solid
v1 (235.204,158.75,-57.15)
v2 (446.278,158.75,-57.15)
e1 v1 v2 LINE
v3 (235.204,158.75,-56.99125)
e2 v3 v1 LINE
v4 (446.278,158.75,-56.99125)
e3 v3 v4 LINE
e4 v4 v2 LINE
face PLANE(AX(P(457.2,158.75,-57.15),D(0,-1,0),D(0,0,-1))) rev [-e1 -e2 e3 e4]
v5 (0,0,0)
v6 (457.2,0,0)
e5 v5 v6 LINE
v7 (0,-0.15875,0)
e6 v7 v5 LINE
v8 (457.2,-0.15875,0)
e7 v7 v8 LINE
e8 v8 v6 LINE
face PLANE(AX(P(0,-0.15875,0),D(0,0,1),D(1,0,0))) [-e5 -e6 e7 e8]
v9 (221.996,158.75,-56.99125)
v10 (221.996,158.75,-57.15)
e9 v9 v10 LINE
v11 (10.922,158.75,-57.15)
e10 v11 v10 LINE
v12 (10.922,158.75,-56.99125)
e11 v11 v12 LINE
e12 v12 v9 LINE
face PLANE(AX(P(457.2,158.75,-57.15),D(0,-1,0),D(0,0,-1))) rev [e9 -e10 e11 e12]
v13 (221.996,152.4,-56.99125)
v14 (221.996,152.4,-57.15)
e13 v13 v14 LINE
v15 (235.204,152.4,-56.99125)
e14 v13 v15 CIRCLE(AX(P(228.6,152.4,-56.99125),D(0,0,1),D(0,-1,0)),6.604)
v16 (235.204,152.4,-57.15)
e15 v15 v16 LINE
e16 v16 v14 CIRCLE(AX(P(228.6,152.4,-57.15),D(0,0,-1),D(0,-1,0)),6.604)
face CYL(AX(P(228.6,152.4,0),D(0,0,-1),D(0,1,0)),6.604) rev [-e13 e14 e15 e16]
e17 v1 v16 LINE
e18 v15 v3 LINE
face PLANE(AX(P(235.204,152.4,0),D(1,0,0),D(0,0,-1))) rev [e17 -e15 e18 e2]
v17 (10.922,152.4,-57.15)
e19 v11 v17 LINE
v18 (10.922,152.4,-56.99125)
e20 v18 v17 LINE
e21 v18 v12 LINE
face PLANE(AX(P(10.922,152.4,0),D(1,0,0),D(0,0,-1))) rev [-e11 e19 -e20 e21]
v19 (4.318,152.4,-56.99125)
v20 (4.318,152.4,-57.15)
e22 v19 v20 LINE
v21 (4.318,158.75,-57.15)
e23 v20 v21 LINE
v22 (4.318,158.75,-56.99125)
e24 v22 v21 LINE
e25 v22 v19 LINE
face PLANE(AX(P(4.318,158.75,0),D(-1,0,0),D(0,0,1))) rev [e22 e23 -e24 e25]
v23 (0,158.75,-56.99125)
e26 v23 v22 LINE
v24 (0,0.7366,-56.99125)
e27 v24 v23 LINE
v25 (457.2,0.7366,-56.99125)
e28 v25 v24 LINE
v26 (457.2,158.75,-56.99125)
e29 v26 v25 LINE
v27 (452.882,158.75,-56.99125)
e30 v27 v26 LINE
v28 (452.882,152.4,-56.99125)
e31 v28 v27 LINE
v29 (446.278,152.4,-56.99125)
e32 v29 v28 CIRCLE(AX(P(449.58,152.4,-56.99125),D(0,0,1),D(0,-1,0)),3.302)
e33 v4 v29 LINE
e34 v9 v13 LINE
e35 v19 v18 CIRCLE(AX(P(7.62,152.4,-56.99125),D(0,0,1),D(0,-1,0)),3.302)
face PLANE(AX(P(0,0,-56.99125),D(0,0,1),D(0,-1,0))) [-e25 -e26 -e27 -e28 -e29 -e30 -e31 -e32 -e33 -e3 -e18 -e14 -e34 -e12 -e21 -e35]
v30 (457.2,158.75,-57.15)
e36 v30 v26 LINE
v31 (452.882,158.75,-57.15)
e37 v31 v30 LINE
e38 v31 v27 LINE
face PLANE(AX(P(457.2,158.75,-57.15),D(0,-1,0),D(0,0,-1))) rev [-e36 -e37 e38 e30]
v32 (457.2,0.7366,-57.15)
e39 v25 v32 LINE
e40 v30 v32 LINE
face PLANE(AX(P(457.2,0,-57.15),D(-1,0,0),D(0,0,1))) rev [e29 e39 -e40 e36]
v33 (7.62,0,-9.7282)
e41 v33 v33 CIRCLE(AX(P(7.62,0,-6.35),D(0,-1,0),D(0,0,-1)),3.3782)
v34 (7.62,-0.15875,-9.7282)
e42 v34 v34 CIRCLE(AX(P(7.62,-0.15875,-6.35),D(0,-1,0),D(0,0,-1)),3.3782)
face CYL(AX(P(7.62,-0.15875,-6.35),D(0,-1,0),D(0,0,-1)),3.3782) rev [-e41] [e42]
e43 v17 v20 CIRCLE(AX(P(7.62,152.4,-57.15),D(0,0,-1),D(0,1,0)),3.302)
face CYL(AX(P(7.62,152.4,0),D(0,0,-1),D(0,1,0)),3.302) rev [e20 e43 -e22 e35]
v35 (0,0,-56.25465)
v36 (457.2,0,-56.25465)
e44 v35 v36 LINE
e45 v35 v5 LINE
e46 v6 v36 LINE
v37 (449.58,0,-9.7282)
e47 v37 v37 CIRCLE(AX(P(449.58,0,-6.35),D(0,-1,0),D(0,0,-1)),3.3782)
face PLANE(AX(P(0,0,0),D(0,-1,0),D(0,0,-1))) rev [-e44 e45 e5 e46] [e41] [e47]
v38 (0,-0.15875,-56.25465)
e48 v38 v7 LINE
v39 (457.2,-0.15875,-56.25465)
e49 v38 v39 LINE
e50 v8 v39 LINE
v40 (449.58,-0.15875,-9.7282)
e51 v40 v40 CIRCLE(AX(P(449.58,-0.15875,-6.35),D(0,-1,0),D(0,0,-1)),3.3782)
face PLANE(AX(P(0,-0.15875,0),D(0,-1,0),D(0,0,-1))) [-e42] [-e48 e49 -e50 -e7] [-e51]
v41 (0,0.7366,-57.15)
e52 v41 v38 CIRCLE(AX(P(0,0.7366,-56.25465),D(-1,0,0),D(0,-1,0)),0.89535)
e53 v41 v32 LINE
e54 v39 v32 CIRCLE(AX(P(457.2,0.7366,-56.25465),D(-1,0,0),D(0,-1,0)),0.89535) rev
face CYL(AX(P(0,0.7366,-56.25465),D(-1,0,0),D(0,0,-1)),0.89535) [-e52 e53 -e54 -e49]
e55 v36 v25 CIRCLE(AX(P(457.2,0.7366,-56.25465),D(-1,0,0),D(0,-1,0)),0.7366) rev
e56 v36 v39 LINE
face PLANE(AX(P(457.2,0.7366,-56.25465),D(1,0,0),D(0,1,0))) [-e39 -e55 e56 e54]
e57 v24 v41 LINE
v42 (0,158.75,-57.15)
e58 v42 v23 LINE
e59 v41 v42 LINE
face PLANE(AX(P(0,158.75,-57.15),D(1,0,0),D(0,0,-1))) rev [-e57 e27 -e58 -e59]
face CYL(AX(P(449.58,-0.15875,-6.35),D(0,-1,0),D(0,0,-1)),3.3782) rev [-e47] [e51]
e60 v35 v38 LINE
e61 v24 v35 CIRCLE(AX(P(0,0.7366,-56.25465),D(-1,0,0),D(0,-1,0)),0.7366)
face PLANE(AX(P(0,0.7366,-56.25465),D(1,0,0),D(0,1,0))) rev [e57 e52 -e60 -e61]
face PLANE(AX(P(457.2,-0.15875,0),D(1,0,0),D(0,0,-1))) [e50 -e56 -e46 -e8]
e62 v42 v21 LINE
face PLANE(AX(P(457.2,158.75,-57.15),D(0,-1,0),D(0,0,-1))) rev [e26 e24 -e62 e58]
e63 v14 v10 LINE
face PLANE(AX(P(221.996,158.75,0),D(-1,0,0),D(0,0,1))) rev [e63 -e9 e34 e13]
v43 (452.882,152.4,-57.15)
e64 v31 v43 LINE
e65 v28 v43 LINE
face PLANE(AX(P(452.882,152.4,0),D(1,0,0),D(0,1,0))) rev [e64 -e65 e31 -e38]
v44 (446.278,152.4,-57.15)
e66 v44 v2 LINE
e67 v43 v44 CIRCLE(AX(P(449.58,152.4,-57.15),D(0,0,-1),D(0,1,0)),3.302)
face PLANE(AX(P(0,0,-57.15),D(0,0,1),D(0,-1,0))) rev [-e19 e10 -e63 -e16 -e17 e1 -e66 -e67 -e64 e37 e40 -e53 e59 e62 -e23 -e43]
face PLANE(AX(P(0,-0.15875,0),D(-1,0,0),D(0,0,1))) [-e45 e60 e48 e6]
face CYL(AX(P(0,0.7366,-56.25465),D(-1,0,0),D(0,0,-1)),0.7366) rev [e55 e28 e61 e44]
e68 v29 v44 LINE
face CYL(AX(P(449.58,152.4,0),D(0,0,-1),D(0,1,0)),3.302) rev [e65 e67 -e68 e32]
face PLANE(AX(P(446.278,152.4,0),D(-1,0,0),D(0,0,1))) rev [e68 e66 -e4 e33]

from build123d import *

# Parameters (mm, degrees)
SKETCH1_W                    = 457.2
SKETCH1_H                    = 57.15
BASE_FLANGE1_DEPTH           = 0.15875
EDGE_FLANGE1_STRIP_W         = 2.1082
EDGE_FLANGE1_STRIP_H         = 0.15875
EDGE_FLANGE1_STRIP_CUT_DEPTH = 457.2
EDGE_FLANGE1_DEPTH           = 457.2
CUT_EXTRUDE1_DEPTH           = 488.3392299
F_1_4_CLEARANCE_HOLE2_D      = 6.7564
F_1_4_CLEARANCE_HOLE2_DEPTH  = 25.4
F_1_4_CLEARANCE_HOLE2_TIP    = 2.029827343


# Sheet-metal steps are written as plain solids
with BuildPart() as part:
    # Sketch1 → Base-Flange1 (new body)
    with BuildSketch(Plane(origin=(0, 0, 0), x_dir=(1, 0, 0), z_dir=(0, 1, 0))):
        with Locations((228.6, 28.575)):
            Rectangle(SKETCH1_W, SKETCH1_H)
    extrude(amount=-BASE_FLANGE1_DEPTH)

    # Edge-Flange1 strip (across the edge) → Edge-Flange1 strip cut (cut)
    with BuildSketch(Plane(origin=(457.2, 0, -57.15), x_dir=(0, 0, 1), z_dir=(-1, 0, 0))):
        with Locations((-0.15875, -0.079375)):
            Rectangle(EDGE_FLANGE1_STRIP_W, EDGE_FLANGE1_STRIP_H)
    extrude(amount=EDGE_FLANGE1_STRIP_CUT_DEPTH, mode=Mode.SUBTRACT)

    # Edge-Flange1 section (across the edge) → Edge-Flange1 (add)
    with BuildSketch(Plane(origin=(457.2, 0, -57.15), x_dir=(0, 0, 1), z_dir=(-1, 0, 0))):
        with BuildLine():
            Line((0, 0.7366), (0, 158.75))
            Line((0, 158.75), (0.15875, 158.75))
            Line((0.15875, 158.75), (0.15875, 0.7366))
            ThreePointArc((0.15875, 0.7366), (0.374495145, 0.215745145), (0.89535, 0))
            Line((0.89535, 0), (0.89535, -0.15875))
            ThreePointArc((0.89535, -0.15875), (0.262241943, 0.103491943), (0, 0.7366))
        make_face()
    extrude(amount=EDGE_FLANGE1_DEPTH)

    # Sketch9 → Cut-Extrude1 (cut, through all)
    with BuildSketch(Plane(origin=(0, 0, -57.15), x_dir=(-1, 0, 0), z_dir=(0, 0, -1))):
        with BuildLine():
            Line((-446.278, 152.4), (-446.278, 158.75))
            Line((-446.278, 158.75), (-452.882, 158.75))
            Line((-452.882, 158.75), (-452.882, 152.4))
            ThreePointArc((-452.882, 152.4), (-449.58, 149.098), (-446.278, 152.4))
        make_face()
        with BuildLine():
            Line((-10.922, 152.4), (-10.922, 158.75))
            Line((-10.922, 158.75), (-4.318, 158.75))
            Line((-4.318, 158.75), (-4.318, 152.4))
            ThreePointArc((-4.318, 152.4), (-7.62, 149.098), (-10.922, 152.4))
        make_face()
        with BuildLine():
            Line((-235.204, 152.4), (-235.204, 158.75))
            Line((-235.204, 158.75), (-221.996, 158.75))
            Line((-221.996, 158.75), (-221.996, 152.4))
            ThreePointArc((-221.996, 152.4), (-228.6, 145.796), (-235.204, 152.4))
        make_face()
    extrude(amount=-CUT_EXTRUDE1_DEPTH, mode=Mode.SUBTRACT)

    # 1/4 Clearance Hole2
    with Locations(Plane(origin=(7.62, -0.15875, -6.35), x_dir=(0, 0, -1), z_dir=(0, -1, 0))):
        with Locations((0, 0), (0, 441.96)):
            Hole(F_1_4_CLEARANCE_HOLE2_D / 2, depth=F_1_4_CLEARANCE_HOLE2_DEPTH)
            with Locations((0, 0, -(F_1_4_CLEARANCE_HOLE2_DEPTH + F_1_4_CLEARANCE_HOLE2_TIP / 2))):  # 118° drill point
                Cone(0, F_1_4_CLEARANCE_HOLE2_D / 2, F_1_4_CLEARANCE_HOLE2_TIP, mode=Mode.SUBTRACT)


solid = part.part
